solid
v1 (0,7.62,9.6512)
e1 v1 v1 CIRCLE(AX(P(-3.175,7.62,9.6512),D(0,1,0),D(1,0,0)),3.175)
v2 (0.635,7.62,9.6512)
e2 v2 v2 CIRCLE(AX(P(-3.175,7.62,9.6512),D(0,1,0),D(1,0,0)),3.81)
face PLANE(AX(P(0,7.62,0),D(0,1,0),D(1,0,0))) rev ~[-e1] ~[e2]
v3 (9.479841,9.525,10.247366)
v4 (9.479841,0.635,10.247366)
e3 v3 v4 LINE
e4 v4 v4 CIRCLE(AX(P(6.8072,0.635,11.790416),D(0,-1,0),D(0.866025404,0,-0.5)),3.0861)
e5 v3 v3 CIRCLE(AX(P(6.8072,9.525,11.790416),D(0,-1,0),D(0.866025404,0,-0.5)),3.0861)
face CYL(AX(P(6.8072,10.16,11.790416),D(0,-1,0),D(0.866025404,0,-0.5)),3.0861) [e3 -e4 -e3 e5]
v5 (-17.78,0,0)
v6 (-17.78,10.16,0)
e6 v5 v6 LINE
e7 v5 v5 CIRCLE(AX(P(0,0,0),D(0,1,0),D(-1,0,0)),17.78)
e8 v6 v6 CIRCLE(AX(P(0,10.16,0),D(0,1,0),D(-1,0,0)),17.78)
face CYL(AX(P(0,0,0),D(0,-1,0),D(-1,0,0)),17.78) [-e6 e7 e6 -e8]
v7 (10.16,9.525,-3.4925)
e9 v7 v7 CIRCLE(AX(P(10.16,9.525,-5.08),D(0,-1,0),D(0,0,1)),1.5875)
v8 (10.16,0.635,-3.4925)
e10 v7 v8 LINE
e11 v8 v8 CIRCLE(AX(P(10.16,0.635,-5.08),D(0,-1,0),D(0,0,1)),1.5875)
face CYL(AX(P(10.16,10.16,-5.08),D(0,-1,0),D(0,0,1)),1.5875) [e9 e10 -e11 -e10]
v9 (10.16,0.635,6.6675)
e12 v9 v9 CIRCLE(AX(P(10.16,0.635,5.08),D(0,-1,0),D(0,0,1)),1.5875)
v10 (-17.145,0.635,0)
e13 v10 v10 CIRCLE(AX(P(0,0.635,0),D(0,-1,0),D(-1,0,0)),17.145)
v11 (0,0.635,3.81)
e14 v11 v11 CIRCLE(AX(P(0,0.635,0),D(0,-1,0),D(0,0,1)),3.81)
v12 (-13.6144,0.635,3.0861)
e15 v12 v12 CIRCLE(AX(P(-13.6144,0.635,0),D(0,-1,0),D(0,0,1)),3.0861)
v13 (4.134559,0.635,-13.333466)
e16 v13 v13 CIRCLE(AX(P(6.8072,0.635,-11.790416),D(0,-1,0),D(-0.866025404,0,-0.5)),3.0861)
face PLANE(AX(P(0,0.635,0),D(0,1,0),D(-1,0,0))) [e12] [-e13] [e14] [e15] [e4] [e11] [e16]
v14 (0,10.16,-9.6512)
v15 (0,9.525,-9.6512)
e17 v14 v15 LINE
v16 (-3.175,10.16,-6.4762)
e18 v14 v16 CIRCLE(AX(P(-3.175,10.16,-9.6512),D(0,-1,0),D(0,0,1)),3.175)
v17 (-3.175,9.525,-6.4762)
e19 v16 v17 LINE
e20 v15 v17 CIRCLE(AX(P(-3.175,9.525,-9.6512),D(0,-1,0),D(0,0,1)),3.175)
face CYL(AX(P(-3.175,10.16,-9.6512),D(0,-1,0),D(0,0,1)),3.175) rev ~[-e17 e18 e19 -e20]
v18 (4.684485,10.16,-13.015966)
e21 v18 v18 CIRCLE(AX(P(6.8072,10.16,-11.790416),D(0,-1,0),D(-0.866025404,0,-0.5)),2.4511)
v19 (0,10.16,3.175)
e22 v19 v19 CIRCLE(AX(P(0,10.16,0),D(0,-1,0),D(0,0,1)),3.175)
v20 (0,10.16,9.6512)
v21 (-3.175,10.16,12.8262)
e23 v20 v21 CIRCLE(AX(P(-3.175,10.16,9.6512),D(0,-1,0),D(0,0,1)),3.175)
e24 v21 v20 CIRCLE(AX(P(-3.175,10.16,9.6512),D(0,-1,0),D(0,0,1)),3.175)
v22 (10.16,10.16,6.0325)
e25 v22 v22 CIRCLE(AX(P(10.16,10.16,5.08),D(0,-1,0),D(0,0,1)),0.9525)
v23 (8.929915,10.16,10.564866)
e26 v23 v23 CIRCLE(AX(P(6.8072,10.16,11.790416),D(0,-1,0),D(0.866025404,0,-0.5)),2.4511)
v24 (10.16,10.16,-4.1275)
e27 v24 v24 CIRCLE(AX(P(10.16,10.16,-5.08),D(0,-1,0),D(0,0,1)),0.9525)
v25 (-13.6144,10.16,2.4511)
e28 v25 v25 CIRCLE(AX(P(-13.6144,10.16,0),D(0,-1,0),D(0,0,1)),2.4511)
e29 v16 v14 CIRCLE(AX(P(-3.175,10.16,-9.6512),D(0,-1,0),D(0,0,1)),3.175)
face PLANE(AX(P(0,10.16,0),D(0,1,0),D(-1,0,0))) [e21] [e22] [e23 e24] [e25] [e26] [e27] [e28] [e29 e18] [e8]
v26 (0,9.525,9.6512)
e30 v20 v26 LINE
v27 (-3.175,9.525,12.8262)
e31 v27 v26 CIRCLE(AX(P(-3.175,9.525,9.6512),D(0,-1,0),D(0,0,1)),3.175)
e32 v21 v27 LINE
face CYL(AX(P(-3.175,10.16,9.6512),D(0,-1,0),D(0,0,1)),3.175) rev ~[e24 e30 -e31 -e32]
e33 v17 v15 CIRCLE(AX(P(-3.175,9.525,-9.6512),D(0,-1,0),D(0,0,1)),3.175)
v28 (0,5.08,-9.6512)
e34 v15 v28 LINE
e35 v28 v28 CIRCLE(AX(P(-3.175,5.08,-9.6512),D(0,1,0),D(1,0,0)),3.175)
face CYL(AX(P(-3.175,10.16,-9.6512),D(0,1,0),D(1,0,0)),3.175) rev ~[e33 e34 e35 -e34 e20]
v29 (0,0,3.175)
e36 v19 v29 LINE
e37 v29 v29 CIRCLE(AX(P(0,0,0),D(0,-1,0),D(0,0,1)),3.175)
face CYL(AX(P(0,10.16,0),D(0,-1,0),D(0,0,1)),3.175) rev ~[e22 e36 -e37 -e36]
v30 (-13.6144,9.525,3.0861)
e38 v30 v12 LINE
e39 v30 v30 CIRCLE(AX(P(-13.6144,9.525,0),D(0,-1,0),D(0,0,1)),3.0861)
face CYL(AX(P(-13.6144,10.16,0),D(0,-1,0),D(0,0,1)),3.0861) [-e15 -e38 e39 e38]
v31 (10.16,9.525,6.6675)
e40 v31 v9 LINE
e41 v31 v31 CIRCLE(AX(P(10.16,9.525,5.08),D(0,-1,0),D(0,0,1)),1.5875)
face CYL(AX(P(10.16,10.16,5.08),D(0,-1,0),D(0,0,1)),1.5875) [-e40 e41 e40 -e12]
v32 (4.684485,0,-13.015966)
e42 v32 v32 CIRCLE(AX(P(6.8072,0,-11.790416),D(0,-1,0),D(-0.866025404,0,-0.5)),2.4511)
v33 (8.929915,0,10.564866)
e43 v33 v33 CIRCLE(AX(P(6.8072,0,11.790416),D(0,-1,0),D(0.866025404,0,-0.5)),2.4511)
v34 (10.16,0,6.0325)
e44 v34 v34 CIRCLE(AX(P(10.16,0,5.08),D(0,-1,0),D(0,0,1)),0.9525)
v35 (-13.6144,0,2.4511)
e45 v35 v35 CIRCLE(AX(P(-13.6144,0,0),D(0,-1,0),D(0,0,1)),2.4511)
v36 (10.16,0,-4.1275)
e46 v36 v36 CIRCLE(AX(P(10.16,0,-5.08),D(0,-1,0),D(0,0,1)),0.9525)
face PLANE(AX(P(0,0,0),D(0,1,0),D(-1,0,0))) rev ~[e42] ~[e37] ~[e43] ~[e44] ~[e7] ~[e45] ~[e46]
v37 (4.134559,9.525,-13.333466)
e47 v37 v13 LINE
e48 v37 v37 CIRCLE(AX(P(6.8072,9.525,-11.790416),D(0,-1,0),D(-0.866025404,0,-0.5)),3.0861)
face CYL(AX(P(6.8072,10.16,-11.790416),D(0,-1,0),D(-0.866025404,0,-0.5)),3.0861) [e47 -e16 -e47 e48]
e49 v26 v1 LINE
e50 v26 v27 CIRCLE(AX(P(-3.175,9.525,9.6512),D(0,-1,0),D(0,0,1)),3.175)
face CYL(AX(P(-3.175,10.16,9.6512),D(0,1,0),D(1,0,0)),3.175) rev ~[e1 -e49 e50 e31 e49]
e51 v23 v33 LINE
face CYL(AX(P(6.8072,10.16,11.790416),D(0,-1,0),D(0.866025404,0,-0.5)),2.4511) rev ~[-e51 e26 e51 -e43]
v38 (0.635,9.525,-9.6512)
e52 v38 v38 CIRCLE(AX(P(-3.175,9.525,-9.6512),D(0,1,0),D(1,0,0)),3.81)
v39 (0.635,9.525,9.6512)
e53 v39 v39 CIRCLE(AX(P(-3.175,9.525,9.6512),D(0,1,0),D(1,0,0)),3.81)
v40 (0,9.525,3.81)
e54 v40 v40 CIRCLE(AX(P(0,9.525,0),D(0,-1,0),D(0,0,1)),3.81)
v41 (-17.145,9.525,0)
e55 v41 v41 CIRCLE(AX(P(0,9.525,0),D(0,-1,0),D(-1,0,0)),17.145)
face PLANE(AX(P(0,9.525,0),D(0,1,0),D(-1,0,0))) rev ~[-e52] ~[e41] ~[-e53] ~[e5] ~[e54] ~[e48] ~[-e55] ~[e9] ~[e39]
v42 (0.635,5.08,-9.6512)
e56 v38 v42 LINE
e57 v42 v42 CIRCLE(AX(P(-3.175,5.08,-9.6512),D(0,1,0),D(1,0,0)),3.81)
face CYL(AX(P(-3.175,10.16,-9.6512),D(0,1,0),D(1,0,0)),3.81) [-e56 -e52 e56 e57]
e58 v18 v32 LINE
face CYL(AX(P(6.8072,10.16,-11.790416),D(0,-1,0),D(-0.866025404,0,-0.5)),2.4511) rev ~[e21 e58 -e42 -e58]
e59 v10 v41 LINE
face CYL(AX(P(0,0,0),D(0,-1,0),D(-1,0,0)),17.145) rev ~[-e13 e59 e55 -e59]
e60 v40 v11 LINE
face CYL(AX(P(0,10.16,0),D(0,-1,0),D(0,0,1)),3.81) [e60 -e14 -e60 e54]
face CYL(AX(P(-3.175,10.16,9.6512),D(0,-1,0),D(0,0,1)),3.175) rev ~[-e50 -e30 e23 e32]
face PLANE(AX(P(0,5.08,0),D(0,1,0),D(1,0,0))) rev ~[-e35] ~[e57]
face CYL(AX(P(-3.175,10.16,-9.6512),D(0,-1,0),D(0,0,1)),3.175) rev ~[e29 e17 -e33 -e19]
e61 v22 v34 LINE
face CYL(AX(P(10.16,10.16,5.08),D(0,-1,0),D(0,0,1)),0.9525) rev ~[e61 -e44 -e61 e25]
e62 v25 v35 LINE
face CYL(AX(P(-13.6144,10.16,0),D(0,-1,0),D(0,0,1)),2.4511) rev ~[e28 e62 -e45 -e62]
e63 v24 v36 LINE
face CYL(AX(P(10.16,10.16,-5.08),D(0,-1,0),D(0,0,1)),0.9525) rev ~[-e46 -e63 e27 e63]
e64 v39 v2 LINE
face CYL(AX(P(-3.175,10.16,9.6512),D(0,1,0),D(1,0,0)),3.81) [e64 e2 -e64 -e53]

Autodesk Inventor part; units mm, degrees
ref_plane "YZ Plane" through (0, 0, 0) normal (1, 0, 0) x (0, 1, 0)
ref_plane "XZ Plane" through (0, 0, 0) normal (0, 1, 0) x (-1, 0, 0)
ref_plane "XY Plane" through (0, 0, 0) normal (0, 0, 1) x (1, 0, 0)
sketch "Sketch1" plane through (0, 0, 0) normal (0, 1, 0) x (-1, 0, 0)
  circle A0 centre (0, 0) radius 17.78
  dimension "d0" = 35.56
extrude "Extrusion1" add sketch "Sketch1" along normal blind 10.16
sketch "Sketch2" plane through (0, 10.16, 0) normal (0, 1, 0) x (1, 0, 0)
  circle A0 centre (0, 0) radius 17.78 projected
hole "Hole1" at (0, 10.16, 0) direction (0, -1, 0) diameter 6.35 end through all
sketch "Sketch3" plane through (0, 10.16, 0) normal (0, 1, 0) x (1, 0, 0)
  line L0 (0, 0) -> (-13.6144, 0)
  dimension "d10" = 13.6144
hole "Hole2" at (-13.6144, 10.16, 0) direction (0, -1, 0) diameter 4.9022 end through all
pattern_circular "Circular Pattern1" count 3 over 360 about axis through (0, -41.1455, 0) along (0, 1, 0) of "Hole2"
sketch "Sketch23" plane through (0, 10.16, 0) normal (0, 1, 0) x (1, 0, 0)
  line L0 (0, 0) -> (10.16, 0)
  line L1 (10.16, 0) -> (10.16, 5.08)
  line L2 (10.16, 5.08) -> (10.16, -5.08)
  dimension "d122" = 10.16
  dimension "d123" = 5.08
  dimension "d124" = 10.16
hole "Hole10" at (10.16, 10.16, -5.08) at (10.16, 10.16, 5.08) direction (0, -1, 0) diameter 1.905 end through all
shell "Shell4" thickness 0.635 removed faces 0
sketch "Sketch26" plane through (0, 10.16, 0) normal (0, 1, 0) x (1, 0, 0)
  line L0 (0, 0) -> (-3.175, 9.6512)
  line L1 (-3.175, 9.6512) -> (0, 0)
  line L2 (0, 0) -> (-3.175, -9.6512)
  dimension "d148" = 10.16
  dimension "d149" = 10.16
hole "Hole12" at (-3.175, 10.16, -9.6512) at (-3.175, 10.16, 9.6512) direction (0, -1, 0) diameter 6.35 depth 2.54
sketch "Sketch27" plane through (0, 10.16, 0) normal (0, 1, 0) x (1, 0, 0)
  circle A0 centre (-3.175, 9.6512) radius 3.175 projected
  circle A1 centre (-3.175, 9.6512) radius 3.81
  circle A2 centre (-3.175, -9.6512) radius 3.175 projected
  circle A3 centre (-3.175, -9.6512) radius 3.81
  point P0 (0, 0)
  dimension "d157" = 7.62
  dimension "d158" = 7.62
extrude "Extrusion15" add sketch "Sketch27" against normal blind 5.08 contours A1
extrude "Extrusion16" add sketch "Sketch27" against normal blind 2.54 contours A3
sketch "Sketch28" plane through (0, 10.16, 0) normal (0, 1, 0) x (1, 0, 0)
  point P0 (0, 0)
properties part number "water"
